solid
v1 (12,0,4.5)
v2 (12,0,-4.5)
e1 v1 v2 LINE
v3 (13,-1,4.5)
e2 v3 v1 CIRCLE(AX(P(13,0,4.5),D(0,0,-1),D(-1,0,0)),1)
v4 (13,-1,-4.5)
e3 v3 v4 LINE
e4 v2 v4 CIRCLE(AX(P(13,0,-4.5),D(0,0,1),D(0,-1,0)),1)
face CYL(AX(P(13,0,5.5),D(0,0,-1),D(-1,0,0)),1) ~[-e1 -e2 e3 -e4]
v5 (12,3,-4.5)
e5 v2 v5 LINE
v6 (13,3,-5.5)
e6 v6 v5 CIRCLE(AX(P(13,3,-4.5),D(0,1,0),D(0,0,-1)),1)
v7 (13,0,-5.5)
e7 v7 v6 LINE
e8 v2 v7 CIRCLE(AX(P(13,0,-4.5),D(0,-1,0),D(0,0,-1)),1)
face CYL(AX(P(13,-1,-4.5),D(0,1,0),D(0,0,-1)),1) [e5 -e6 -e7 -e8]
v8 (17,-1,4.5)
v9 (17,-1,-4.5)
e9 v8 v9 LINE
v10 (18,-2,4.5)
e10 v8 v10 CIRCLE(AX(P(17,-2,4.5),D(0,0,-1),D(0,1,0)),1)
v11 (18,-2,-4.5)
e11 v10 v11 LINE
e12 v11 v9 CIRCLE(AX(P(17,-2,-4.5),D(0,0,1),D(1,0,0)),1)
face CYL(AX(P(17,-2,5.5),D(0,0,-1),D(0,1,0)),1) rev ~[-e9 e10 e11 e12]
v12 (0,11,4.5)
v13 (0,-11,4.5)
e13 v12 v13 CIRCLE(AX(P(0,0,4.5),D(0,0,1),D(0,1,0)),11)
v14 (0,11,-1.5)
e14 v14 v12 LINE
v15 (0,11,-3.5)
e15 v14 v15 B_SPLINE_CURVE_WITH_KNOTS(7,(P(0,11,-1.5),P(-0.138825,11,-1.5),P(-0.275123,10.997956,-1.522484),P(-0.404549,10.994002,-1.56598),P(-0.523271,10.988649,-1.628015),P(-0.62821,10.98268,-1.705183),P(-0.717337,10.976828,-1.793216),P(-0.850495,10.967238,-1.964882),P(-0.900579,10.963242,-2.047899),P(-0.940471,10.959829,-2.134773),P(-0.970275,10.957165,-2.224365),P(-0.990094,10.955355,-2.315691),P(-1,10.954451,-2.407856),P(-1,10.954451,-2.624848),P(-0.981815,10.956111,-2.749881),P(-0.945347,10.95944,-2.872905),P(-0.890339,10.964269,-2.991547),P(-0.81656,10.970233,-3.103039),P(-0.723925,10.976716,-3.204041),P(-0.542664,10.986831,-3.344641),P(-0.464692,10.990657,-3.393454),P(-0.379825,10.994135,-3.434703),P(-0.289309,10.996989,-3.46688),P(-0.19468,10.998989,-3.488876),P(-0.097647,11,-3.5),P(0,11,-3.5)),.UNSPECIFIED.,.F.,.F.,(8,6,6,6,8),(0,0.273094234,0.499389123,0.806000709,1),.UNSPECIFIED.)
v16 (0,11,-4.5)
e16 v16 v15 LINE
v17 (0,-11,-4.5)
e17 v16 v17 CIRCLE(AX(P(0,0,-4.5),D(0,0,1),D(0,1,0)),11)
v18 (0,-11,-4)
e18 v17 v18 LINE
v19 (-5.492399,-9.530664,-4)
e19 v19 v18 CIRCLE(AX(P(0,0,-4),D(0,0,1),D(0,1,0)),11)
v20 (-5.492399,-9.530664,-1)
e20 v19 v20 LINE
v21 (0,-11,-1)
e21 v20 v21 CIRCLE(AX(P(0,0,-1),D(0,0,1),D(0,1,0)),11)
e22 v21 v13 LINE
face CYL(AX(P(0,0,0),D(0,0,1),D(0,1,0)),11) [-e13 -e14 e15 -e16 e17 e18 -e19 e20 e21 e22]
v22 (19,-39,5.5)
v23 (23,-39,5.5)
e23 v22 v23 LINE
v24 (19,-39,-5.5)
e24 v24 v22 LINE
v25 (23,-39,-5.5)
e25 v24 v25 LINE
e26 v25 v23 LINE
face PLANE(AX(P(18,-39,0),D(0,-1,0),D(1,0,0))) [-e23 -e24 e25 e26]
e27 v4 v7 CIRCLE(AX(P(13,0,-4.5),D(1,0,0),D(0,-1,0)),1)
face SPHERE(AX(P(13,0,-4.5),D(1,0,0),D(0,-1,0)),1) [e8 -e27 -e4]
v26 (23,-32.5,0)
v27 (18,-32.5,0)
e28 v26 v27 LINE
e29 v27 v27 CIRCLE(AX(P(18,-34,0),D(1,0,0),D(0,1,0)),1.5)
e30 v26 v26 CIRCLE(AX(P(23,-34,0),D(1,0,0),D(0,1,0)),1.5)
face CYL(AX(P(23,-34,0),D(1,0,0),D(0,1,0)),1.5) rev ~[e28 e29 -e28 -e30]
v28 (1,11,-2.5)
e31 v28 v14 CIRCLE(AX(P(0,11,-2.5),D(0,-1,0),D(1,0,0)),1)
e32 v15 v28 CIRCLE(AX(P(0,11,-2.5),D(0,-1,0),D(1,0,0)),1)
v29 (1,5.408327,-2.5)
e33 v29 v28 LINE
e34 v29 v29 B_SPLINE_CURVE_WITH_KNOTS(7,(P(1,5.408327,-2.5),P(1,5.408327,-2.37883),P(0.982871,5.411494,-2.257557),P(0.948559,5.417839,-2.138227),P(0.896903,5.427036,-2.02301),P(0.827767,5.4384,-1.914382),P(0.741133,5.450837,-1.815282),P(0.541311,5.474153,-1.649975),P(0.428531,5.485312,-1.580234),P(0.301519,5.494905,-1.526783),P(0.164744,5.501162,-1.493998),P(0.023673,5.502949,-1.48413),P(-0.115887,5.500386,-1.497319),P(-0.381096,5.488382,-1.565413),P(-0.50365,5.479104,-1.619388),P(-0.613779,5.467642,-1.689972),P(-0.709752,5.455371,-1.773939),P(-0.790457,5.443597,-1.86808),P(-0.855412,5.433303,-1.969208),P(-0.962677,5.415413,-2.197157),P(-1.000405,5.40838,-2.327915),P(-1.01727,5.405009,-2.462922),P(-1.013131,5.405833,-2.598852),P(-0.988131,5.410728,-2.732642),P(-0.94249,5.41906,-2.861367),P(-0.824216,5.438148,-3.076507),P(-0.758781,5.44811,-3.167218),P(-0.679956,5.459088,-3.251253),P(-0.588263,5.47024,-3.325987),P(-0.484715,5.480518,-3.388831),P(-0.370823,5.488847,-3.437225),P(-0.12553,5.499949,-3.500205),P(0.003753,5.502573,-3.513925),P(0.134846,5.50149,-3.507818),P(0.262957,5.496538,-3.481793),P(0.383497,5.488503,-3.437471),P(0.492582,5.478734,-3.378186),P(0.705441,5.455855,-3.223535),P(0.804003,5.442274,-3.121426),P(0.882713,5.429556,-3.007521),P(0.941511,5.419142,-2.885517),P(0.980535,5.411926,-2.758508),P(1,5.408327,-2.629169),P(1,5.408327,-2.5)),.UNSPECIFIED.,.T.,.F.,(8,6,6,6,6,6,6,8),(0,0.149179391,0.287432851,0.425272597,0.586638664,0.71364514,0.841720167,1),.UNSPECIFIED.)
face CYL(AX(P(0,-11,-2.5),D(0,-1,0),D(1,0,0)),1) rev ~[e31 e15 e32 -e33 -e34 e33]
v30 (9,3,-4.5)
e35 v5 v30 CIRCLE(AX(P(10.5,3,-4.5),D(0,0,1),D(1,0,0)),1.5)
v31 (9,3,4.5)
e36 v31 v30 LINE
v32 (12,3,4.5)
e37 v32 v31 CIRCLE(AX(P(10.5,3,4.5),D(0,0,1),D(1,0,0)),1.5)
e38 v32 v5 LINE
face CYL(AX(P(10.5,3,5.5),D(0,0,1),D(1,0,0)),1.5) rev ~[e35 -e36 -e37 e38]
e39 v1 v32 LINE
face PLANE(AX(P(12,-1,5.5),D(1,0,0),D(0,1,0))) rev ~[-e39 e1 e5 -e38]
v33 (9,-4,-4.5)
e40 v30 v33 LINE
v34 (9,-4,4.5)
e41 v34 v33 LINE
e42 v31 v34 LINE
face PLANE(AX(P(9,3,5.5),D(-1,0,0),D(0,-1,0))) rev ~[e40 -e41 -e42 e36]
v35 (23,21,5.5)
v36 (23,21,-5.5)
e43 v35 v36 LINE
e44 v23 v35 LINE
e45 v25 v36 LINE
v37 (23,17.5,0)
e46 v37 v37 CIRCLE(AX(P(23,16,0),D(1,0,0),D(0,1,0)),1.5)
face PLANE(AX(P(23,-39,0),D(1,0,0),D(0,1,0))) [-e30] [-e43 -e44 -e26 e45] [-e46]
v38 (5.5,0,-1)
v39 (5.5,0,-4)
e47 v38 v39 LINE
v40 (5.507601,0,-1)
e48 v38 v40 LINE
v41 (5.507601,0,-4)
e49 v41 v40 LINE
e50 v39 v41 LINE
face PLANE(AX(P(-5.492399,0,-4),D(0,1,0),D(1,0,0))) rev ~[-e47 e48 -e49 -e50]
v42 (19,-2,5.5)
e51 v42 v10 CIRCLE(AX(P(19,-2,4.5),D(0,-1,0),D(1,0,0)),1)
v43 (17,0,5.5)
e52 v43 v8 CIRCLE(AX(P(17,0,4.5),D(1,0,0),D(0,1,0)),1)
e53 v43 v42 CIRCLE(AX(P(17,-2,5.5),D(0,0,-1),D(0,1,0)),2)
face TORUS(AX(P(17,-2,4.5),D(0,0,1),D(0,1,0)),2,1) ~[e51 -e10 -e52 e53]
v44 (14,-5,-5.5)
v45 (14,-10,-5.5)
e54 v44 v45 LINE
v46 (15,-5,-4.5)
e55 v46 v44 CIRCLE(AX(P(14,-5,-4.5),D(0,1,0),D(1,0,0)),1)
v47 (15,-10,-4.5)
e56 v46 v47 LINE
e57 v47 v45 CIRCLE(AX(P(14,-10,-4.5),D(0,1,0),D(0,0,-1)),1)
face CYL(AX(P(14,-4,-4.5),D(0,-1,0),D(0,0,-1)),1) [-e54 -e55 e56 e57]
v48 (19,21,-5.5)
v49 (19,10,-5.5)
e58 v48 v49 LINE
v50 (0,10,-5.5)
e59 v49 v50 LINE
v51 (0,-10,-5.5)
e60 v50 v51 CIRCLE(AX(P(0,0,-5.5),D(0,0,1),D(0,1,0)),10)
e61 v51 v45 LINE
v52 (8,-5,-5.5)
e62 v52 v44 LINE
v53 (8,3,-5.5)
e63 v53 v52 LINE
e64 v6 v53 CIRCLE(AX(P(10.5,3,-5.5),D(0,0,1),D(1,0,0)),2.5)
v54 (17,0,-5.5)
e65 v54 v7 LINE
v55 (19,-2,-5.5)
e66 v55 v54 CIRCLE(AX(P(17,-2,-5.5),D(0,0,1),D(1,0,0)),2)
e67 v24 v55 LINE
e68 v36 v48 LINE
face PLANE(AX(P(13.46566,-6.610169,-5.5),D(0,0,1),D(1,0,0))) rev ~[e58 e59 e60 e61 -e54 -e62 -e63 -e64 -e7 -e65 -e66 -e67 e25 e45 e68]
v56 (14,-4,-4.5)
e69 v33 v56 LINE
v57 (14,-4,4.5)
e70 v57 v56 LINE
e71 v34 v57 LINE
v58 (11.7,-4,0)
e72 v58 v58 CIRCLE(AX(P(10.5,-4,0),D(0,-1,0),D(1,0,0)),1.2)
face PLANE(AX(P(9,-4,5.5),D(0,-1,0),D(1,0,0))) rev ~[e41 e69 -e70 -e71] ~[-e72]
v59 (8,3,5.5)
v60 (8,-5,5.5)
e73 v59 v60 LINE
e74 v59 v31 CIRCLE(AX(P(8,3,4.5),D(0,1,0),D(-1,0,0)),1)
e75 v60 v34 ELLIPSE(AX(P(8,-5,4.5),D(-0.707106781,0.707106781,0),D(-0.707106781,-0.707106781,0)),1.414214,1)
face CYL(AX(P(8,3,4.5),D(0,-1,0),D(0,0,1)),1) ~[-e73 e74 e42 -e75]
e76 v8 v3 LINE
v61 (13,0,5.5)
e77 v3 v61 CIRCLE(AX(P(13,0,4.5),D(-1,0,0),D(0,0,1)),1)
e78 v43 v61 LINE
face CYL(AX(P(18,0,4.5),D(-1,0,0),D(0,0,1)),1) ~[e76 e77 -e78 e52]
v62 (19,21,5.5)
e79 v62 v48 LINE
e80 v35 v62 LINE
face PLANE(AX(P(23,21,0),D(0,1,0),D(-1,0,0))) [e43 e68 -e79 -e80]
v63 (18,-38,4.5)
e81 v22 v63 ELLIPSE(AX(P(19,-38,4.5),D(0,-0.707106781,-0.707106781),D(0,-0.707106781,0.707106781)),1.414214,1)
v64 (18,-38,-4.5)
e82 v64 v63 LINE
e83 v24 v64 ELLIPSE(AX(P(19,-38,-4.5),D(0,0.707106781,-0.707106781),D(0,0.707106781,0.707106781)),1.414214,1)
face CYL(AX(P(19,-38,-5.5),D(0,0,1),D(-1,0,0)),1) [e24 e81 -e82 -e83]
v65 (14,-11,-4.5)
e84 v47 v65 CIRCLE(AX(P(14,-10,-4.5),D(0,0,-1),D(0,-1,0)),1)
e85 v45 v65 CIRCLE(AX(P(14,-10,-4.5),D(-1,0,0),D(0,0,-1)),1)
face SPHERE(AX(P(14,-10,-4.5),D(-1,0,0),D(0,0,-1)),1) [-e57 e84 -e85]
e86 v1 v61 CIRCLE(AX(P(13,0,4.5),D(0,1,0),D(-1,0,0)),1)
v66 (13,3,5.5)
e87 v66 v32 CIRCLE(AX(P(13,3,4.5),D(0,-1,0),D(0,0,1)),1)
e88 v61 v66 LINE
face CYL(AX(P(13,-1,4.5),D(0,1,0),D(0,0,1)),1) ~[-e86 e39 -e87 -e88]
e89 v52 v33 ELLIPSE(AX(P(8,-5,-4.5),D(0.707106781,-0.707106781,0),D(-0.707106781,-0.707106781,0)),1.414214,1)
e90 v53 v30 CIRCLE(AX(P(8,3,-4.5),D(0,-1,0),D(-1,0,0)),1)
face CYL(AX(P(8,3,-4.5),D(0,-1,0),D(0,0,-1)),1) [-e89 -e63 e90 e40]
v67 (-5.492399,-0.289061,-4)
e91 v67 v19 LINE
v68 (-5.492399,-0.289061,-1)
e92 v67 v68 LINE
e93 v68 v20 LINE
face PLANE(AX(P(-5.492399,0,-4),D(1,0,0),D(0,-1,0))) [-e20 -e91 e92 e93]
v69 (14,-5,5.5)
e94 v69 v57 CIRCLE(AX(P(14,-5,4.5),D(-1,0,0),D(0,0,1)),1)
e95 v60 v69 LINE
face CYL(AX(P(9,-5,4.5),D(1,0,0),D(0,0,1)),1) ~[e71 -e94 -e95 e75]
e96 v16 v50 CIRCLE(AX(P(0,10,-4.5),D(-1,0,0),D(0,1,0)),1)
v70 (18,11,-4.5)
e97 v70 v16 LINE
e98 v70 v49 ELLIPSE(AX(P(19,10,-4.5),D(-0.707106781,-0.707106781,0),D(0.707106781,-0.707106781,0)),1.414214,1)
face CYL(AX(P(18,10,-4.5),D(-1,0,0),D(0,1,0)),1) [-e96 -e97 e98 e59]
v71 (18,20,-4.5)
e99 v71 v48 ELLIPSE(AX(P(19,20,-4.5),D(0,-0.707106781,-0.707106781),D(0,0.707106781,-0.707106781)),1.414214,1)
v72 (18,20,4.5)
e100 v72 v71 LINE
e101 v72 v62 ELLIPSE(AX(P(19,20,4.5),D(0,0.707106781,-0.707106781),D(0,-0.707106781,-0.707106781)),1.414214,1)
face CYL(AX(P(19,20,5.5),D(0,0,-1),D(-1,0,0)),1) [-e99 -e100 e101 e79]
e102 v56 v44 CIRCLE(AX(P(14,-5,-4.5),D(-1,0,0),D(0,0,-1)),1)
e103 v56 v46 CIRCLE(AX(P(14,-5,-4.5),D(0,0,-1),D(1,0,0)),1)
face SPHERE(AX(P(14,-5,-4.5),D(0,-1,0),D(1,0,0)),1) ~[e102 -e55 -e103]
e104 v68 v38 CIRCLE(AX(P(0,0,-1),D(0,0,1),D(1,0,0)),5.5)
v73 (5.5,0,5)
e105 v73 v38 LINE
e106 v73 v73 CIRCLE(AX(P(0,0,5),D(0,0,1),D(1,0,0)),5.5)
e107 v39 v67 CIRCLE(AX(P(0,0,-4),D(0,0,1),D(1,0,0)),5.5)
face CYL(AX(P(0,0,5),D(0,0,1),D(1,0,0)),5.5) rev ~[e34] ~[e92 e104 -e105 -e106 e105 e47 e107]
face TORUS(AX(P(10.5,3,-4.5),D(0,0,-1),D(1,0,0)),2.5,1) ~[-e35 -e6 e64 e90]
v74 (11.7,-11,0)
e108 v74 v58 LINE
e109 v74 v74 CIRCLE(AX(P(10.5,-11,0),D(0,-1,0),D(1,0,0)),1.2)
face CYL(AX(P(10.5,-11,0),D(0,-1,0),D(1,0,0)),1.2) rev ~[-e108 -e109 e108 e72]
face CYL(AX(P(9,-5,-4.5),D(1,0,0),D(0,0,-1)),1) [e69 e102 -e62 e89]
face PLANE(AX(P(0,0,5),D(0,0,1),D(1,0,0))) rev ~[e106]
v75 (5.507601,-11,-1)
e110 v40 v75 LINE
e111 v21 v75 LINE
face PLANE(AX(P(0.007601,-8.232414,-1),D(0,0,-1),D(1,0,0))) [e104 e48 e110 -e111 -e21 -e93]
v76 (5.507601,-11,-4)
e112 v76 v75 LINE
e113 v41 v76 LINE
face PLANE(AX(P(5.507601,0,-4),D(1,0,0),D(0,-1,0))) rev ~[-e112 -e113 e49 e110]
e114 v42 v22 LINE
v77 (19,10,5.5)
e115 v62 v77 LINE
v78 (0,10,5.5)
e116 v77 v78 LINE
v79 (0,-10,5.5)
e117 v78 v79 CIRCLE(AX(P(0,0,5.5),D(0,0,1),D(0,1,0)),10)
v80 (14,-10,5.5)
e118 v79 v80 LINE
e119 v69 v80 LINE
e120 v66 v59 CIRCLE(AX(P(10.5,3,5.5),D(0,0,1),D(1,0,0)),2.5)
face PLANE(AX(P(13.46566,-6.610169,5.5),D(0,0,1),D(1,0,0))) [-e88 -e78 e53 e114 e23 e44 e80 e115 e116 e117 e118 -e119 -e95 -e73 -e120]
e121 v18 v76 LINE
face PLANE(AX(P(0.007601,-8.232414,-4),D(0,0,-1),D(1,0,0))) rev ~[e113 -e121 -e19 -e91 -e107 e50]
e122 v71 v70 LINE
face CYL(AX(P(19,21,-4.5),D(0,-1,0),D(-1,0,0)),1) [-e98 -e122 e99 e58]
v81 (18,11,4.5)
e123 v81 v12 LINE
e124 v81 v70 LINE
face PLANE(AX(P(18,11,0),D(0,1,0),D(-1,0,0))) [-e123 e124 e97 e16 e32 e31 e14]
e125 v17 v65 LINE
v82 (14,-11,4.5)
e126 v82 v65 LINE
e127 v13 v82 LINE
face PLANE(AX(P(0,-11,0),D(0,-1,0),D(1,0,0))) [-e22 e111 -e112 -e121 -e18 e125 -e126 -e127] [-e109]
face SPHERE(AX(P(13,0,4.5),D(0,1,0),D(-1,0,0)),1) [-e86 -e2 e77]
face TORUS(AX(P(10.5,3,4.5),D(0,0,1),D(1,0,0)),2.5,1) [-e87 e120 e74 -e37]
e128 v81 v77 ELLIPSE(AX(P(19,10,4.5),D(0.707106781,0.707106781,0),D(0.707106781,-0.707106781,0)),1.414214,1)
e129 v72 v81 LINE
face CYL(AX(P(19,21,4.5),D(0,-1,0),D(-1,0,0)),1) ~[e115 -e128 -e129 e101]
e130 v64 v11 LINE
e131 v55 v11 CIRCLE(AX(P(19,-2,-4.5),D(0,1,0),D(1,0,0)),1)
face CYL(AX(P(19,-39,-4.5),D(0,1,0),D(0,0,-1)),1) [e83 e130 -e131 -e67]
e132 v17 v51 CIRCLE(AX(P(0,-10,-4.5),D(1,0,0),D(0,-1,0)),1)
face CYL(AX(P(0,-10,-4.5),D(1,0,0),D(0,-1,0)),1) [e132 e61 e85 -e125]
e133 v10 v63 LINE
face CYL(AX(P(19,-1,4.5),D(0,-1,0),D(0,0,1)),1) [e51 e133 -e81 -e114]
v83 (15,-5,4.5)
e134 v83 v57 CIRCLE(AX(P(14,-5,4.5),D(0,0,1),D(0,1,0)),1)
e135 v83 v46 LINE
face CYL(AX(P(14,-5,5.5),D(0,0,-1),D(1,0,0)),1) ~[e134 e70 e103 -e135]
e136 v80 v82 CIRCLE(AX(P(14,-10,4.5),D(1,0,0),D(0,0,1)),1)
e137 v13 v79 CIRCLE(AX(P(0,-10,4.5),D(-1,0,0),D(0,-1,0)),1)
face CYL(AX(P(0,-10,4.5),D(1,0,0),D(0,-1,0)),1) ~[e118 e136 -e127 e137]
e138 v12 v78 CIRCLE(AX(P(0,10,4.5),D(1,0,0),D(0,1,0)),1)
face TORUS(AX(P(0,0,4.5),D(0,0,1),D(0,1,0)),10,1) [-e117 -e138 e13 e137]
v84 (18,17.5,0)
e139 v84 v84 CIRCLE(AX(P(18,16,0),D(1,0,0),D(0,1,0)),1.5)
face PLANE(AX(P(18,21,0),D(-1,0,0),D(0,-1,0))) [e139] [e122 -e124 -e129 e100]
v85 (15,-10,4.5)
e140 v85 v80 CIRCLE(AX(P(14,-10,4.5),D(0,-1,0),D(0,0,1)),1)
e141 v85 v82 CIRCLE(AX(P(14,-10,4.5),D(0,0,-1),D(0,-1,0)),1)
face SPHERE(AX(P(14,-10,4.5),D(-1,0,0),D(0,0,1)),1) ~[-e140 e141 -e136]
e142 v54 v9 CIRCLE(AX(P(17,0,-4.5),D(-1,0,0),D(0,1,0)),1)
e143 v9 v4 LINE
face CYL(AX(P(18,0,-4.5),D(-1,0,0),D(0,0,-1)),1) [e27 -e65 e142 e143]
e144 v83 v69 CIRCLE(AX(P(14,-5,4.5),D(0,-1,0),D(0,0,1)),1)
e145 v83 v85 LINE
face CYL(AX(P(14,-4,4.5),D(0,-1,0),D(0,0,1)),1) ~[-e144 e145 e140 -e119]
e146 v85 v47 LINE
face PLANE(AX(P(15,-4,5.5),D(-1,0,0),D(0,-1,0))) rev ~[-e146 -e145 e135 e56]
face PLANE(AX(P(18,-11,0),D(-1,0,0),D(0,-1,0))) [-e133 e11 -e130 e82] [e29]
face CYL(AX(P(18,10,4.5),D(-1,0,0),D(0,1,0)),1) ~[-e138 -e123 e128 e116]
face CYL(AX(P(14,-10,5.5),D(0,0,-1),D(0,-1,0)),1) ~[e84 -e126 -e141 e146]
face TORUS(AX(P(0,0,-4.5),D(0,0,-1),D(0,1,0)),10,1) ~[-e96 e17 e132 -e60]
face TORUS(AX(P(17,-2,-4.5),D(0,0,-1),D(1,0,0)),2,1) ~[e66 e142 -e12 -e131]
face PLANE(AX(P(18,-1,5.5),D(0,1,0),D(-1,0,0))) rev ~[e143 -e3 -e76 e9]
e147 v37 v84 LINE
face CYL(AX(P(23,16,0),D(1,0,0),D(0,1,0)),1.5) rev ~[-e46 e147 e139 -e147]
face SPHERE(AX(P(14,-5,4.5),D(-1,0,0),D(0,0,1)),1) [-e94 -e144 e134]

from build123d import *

# Parameters (mm, degrees)
F1_DEPTH  = 5.5
F2_R      = 1.5
F3_DEPTH  = 25
F5_START  = -0.5
F4_R      = 5.5
F5_DEPTH  = 9
F7_START  = -1.5
F6_W      = 11
F6_H      = 16.464828267
F7_DEPTH  = 3
F8_R      = 1
F9_DEPTH  = 25
F11_DEPTH = 25
F12_R     = 1.2
F13_DEPTH = 7
F14_R     = 1


with BuildPart() as f1:
    # F0 (on Top) → F1 (new body, symmetric)
    with BuildSketch(Plane.XY):
        with BuildLine():
            Line((18, 11), (0, 11))
            ThreePointArc((0, 11), (-11, 0), (0, -11))
            Line((0, -11), (18, -11))
            Line((18, -11), (18, -39))
            Line((18, -39), (23, -39))
            Line((23, -39), (23, 21))
            Line((23, 21), (18, 21))
            Line((18, 21), (18, 11))
        make_face()
    extrude(amount=F1_DEPTH, both=True)

    # F2 (on face) → F3 (cut)
    with BuildSketch(Plane.YZ.offset(23)):
        with Locations((16, 0)):
            Circle(F2_R)
        with Locations((-34, 0)):
            Circle(F2_R)
    extrude(amount=-F3_DEPTH, mode=Mode.SUBTRACT)

    # F4 (on face) → F5 (cut)
    with BuildSketch(Plane.XY.offset(5.5).offset(F5_START)):
        Circle(F4_R)
    extrude(amount=-F5_DEPTH, mode=Mode.SUBTRACT)

    # F6 (on face) → F7 (cut)
    with BuildSketch(Plane(origin=(0, 0, -5.5), x_dir=(1, 0, 0), z_dir=(0, 0, -1)).offset(F7_START)):
        with Locations((0.0076012546, 8.2324141335)):
            Rectangle(F6_W, F6_H)
    extrude(amount=-F7_DEPTH, mode=Mode.SUBTRACT)

    # F8 (on face) → F9 (cut)
    with BuildSketch(Plane.XZ.offset(11)):
        with Locations((0, -2.5)):
            Circle(F8_R)
    extrude(amount=-F9_DEPTH, mode=Mode.SUBTRACT)

    # F10 (on face) → F11 (cut)
    with BuildSketch(Plane.XY.offset(5.5)):
        with BuildLine():
            Line((12, -1), (12, 3))
            ThreePointArc((12, 3), (10.5, 4.5), (9, 3))
            Line((9, 3), (9, -4))
            Line((9, -4), (15, -4))
            Line((15, -4), (15, -11))
            Line((15, -11), (18, -11))
            Line((18, -11), (18, -1))
            Line((18, -1), (12, -1))
        make_face()
    extrude(amount=-F11_DEPTH, mode=Mode.SUBTRACT)

    # F12 (on face) → F13 (cut, through all)
    with BuildSketch(Plane.XZ.offset(11)):
        with Locations((10.5, 0)):
            Circle(F12_R)
    extrude(amount=-F13_DEPTH, mode=Mode.SUBTRACT)

    # F14
    f14_edges = [f1.edges().sort_by_distance(p)[0] for p in [
        (18, 16, 5.5),
        (18, 21, 0),
        (18, 16, -5.5),
        (9, 11, 5.5),
        (18, -20, 5.5),
        (-11, 0, -5.5),
        (7.5, -11, -5.5),
        (18, -20, -5.5),
        (15, -1, -5.5),
        (18, -39, 0),
        (18, -1, 0),
        (12, 1, 5.5),
        (12, -4, 5.5),
        (15, -7.5, -5.5),
        (15, -7.5, 5.5),
        (15, -11, 0),
        (15, -4, 0),
        (12, -1, 0),
        (9, -0.5, -5.5),
        (12, -4, -5.5),
        (9, 11, -5.5),
        (-11, 0, 5.5),
        (7.5, -11, 5.5),
        (9, -0.5, 5.5),
        (10.5, 4.5, 5.5),
        (15, -1, 5.5),
        (10.5, 4.5, -5.5),
    ]]
    fillet(f14_edges, radius=F14_R)


solid = f1.part
